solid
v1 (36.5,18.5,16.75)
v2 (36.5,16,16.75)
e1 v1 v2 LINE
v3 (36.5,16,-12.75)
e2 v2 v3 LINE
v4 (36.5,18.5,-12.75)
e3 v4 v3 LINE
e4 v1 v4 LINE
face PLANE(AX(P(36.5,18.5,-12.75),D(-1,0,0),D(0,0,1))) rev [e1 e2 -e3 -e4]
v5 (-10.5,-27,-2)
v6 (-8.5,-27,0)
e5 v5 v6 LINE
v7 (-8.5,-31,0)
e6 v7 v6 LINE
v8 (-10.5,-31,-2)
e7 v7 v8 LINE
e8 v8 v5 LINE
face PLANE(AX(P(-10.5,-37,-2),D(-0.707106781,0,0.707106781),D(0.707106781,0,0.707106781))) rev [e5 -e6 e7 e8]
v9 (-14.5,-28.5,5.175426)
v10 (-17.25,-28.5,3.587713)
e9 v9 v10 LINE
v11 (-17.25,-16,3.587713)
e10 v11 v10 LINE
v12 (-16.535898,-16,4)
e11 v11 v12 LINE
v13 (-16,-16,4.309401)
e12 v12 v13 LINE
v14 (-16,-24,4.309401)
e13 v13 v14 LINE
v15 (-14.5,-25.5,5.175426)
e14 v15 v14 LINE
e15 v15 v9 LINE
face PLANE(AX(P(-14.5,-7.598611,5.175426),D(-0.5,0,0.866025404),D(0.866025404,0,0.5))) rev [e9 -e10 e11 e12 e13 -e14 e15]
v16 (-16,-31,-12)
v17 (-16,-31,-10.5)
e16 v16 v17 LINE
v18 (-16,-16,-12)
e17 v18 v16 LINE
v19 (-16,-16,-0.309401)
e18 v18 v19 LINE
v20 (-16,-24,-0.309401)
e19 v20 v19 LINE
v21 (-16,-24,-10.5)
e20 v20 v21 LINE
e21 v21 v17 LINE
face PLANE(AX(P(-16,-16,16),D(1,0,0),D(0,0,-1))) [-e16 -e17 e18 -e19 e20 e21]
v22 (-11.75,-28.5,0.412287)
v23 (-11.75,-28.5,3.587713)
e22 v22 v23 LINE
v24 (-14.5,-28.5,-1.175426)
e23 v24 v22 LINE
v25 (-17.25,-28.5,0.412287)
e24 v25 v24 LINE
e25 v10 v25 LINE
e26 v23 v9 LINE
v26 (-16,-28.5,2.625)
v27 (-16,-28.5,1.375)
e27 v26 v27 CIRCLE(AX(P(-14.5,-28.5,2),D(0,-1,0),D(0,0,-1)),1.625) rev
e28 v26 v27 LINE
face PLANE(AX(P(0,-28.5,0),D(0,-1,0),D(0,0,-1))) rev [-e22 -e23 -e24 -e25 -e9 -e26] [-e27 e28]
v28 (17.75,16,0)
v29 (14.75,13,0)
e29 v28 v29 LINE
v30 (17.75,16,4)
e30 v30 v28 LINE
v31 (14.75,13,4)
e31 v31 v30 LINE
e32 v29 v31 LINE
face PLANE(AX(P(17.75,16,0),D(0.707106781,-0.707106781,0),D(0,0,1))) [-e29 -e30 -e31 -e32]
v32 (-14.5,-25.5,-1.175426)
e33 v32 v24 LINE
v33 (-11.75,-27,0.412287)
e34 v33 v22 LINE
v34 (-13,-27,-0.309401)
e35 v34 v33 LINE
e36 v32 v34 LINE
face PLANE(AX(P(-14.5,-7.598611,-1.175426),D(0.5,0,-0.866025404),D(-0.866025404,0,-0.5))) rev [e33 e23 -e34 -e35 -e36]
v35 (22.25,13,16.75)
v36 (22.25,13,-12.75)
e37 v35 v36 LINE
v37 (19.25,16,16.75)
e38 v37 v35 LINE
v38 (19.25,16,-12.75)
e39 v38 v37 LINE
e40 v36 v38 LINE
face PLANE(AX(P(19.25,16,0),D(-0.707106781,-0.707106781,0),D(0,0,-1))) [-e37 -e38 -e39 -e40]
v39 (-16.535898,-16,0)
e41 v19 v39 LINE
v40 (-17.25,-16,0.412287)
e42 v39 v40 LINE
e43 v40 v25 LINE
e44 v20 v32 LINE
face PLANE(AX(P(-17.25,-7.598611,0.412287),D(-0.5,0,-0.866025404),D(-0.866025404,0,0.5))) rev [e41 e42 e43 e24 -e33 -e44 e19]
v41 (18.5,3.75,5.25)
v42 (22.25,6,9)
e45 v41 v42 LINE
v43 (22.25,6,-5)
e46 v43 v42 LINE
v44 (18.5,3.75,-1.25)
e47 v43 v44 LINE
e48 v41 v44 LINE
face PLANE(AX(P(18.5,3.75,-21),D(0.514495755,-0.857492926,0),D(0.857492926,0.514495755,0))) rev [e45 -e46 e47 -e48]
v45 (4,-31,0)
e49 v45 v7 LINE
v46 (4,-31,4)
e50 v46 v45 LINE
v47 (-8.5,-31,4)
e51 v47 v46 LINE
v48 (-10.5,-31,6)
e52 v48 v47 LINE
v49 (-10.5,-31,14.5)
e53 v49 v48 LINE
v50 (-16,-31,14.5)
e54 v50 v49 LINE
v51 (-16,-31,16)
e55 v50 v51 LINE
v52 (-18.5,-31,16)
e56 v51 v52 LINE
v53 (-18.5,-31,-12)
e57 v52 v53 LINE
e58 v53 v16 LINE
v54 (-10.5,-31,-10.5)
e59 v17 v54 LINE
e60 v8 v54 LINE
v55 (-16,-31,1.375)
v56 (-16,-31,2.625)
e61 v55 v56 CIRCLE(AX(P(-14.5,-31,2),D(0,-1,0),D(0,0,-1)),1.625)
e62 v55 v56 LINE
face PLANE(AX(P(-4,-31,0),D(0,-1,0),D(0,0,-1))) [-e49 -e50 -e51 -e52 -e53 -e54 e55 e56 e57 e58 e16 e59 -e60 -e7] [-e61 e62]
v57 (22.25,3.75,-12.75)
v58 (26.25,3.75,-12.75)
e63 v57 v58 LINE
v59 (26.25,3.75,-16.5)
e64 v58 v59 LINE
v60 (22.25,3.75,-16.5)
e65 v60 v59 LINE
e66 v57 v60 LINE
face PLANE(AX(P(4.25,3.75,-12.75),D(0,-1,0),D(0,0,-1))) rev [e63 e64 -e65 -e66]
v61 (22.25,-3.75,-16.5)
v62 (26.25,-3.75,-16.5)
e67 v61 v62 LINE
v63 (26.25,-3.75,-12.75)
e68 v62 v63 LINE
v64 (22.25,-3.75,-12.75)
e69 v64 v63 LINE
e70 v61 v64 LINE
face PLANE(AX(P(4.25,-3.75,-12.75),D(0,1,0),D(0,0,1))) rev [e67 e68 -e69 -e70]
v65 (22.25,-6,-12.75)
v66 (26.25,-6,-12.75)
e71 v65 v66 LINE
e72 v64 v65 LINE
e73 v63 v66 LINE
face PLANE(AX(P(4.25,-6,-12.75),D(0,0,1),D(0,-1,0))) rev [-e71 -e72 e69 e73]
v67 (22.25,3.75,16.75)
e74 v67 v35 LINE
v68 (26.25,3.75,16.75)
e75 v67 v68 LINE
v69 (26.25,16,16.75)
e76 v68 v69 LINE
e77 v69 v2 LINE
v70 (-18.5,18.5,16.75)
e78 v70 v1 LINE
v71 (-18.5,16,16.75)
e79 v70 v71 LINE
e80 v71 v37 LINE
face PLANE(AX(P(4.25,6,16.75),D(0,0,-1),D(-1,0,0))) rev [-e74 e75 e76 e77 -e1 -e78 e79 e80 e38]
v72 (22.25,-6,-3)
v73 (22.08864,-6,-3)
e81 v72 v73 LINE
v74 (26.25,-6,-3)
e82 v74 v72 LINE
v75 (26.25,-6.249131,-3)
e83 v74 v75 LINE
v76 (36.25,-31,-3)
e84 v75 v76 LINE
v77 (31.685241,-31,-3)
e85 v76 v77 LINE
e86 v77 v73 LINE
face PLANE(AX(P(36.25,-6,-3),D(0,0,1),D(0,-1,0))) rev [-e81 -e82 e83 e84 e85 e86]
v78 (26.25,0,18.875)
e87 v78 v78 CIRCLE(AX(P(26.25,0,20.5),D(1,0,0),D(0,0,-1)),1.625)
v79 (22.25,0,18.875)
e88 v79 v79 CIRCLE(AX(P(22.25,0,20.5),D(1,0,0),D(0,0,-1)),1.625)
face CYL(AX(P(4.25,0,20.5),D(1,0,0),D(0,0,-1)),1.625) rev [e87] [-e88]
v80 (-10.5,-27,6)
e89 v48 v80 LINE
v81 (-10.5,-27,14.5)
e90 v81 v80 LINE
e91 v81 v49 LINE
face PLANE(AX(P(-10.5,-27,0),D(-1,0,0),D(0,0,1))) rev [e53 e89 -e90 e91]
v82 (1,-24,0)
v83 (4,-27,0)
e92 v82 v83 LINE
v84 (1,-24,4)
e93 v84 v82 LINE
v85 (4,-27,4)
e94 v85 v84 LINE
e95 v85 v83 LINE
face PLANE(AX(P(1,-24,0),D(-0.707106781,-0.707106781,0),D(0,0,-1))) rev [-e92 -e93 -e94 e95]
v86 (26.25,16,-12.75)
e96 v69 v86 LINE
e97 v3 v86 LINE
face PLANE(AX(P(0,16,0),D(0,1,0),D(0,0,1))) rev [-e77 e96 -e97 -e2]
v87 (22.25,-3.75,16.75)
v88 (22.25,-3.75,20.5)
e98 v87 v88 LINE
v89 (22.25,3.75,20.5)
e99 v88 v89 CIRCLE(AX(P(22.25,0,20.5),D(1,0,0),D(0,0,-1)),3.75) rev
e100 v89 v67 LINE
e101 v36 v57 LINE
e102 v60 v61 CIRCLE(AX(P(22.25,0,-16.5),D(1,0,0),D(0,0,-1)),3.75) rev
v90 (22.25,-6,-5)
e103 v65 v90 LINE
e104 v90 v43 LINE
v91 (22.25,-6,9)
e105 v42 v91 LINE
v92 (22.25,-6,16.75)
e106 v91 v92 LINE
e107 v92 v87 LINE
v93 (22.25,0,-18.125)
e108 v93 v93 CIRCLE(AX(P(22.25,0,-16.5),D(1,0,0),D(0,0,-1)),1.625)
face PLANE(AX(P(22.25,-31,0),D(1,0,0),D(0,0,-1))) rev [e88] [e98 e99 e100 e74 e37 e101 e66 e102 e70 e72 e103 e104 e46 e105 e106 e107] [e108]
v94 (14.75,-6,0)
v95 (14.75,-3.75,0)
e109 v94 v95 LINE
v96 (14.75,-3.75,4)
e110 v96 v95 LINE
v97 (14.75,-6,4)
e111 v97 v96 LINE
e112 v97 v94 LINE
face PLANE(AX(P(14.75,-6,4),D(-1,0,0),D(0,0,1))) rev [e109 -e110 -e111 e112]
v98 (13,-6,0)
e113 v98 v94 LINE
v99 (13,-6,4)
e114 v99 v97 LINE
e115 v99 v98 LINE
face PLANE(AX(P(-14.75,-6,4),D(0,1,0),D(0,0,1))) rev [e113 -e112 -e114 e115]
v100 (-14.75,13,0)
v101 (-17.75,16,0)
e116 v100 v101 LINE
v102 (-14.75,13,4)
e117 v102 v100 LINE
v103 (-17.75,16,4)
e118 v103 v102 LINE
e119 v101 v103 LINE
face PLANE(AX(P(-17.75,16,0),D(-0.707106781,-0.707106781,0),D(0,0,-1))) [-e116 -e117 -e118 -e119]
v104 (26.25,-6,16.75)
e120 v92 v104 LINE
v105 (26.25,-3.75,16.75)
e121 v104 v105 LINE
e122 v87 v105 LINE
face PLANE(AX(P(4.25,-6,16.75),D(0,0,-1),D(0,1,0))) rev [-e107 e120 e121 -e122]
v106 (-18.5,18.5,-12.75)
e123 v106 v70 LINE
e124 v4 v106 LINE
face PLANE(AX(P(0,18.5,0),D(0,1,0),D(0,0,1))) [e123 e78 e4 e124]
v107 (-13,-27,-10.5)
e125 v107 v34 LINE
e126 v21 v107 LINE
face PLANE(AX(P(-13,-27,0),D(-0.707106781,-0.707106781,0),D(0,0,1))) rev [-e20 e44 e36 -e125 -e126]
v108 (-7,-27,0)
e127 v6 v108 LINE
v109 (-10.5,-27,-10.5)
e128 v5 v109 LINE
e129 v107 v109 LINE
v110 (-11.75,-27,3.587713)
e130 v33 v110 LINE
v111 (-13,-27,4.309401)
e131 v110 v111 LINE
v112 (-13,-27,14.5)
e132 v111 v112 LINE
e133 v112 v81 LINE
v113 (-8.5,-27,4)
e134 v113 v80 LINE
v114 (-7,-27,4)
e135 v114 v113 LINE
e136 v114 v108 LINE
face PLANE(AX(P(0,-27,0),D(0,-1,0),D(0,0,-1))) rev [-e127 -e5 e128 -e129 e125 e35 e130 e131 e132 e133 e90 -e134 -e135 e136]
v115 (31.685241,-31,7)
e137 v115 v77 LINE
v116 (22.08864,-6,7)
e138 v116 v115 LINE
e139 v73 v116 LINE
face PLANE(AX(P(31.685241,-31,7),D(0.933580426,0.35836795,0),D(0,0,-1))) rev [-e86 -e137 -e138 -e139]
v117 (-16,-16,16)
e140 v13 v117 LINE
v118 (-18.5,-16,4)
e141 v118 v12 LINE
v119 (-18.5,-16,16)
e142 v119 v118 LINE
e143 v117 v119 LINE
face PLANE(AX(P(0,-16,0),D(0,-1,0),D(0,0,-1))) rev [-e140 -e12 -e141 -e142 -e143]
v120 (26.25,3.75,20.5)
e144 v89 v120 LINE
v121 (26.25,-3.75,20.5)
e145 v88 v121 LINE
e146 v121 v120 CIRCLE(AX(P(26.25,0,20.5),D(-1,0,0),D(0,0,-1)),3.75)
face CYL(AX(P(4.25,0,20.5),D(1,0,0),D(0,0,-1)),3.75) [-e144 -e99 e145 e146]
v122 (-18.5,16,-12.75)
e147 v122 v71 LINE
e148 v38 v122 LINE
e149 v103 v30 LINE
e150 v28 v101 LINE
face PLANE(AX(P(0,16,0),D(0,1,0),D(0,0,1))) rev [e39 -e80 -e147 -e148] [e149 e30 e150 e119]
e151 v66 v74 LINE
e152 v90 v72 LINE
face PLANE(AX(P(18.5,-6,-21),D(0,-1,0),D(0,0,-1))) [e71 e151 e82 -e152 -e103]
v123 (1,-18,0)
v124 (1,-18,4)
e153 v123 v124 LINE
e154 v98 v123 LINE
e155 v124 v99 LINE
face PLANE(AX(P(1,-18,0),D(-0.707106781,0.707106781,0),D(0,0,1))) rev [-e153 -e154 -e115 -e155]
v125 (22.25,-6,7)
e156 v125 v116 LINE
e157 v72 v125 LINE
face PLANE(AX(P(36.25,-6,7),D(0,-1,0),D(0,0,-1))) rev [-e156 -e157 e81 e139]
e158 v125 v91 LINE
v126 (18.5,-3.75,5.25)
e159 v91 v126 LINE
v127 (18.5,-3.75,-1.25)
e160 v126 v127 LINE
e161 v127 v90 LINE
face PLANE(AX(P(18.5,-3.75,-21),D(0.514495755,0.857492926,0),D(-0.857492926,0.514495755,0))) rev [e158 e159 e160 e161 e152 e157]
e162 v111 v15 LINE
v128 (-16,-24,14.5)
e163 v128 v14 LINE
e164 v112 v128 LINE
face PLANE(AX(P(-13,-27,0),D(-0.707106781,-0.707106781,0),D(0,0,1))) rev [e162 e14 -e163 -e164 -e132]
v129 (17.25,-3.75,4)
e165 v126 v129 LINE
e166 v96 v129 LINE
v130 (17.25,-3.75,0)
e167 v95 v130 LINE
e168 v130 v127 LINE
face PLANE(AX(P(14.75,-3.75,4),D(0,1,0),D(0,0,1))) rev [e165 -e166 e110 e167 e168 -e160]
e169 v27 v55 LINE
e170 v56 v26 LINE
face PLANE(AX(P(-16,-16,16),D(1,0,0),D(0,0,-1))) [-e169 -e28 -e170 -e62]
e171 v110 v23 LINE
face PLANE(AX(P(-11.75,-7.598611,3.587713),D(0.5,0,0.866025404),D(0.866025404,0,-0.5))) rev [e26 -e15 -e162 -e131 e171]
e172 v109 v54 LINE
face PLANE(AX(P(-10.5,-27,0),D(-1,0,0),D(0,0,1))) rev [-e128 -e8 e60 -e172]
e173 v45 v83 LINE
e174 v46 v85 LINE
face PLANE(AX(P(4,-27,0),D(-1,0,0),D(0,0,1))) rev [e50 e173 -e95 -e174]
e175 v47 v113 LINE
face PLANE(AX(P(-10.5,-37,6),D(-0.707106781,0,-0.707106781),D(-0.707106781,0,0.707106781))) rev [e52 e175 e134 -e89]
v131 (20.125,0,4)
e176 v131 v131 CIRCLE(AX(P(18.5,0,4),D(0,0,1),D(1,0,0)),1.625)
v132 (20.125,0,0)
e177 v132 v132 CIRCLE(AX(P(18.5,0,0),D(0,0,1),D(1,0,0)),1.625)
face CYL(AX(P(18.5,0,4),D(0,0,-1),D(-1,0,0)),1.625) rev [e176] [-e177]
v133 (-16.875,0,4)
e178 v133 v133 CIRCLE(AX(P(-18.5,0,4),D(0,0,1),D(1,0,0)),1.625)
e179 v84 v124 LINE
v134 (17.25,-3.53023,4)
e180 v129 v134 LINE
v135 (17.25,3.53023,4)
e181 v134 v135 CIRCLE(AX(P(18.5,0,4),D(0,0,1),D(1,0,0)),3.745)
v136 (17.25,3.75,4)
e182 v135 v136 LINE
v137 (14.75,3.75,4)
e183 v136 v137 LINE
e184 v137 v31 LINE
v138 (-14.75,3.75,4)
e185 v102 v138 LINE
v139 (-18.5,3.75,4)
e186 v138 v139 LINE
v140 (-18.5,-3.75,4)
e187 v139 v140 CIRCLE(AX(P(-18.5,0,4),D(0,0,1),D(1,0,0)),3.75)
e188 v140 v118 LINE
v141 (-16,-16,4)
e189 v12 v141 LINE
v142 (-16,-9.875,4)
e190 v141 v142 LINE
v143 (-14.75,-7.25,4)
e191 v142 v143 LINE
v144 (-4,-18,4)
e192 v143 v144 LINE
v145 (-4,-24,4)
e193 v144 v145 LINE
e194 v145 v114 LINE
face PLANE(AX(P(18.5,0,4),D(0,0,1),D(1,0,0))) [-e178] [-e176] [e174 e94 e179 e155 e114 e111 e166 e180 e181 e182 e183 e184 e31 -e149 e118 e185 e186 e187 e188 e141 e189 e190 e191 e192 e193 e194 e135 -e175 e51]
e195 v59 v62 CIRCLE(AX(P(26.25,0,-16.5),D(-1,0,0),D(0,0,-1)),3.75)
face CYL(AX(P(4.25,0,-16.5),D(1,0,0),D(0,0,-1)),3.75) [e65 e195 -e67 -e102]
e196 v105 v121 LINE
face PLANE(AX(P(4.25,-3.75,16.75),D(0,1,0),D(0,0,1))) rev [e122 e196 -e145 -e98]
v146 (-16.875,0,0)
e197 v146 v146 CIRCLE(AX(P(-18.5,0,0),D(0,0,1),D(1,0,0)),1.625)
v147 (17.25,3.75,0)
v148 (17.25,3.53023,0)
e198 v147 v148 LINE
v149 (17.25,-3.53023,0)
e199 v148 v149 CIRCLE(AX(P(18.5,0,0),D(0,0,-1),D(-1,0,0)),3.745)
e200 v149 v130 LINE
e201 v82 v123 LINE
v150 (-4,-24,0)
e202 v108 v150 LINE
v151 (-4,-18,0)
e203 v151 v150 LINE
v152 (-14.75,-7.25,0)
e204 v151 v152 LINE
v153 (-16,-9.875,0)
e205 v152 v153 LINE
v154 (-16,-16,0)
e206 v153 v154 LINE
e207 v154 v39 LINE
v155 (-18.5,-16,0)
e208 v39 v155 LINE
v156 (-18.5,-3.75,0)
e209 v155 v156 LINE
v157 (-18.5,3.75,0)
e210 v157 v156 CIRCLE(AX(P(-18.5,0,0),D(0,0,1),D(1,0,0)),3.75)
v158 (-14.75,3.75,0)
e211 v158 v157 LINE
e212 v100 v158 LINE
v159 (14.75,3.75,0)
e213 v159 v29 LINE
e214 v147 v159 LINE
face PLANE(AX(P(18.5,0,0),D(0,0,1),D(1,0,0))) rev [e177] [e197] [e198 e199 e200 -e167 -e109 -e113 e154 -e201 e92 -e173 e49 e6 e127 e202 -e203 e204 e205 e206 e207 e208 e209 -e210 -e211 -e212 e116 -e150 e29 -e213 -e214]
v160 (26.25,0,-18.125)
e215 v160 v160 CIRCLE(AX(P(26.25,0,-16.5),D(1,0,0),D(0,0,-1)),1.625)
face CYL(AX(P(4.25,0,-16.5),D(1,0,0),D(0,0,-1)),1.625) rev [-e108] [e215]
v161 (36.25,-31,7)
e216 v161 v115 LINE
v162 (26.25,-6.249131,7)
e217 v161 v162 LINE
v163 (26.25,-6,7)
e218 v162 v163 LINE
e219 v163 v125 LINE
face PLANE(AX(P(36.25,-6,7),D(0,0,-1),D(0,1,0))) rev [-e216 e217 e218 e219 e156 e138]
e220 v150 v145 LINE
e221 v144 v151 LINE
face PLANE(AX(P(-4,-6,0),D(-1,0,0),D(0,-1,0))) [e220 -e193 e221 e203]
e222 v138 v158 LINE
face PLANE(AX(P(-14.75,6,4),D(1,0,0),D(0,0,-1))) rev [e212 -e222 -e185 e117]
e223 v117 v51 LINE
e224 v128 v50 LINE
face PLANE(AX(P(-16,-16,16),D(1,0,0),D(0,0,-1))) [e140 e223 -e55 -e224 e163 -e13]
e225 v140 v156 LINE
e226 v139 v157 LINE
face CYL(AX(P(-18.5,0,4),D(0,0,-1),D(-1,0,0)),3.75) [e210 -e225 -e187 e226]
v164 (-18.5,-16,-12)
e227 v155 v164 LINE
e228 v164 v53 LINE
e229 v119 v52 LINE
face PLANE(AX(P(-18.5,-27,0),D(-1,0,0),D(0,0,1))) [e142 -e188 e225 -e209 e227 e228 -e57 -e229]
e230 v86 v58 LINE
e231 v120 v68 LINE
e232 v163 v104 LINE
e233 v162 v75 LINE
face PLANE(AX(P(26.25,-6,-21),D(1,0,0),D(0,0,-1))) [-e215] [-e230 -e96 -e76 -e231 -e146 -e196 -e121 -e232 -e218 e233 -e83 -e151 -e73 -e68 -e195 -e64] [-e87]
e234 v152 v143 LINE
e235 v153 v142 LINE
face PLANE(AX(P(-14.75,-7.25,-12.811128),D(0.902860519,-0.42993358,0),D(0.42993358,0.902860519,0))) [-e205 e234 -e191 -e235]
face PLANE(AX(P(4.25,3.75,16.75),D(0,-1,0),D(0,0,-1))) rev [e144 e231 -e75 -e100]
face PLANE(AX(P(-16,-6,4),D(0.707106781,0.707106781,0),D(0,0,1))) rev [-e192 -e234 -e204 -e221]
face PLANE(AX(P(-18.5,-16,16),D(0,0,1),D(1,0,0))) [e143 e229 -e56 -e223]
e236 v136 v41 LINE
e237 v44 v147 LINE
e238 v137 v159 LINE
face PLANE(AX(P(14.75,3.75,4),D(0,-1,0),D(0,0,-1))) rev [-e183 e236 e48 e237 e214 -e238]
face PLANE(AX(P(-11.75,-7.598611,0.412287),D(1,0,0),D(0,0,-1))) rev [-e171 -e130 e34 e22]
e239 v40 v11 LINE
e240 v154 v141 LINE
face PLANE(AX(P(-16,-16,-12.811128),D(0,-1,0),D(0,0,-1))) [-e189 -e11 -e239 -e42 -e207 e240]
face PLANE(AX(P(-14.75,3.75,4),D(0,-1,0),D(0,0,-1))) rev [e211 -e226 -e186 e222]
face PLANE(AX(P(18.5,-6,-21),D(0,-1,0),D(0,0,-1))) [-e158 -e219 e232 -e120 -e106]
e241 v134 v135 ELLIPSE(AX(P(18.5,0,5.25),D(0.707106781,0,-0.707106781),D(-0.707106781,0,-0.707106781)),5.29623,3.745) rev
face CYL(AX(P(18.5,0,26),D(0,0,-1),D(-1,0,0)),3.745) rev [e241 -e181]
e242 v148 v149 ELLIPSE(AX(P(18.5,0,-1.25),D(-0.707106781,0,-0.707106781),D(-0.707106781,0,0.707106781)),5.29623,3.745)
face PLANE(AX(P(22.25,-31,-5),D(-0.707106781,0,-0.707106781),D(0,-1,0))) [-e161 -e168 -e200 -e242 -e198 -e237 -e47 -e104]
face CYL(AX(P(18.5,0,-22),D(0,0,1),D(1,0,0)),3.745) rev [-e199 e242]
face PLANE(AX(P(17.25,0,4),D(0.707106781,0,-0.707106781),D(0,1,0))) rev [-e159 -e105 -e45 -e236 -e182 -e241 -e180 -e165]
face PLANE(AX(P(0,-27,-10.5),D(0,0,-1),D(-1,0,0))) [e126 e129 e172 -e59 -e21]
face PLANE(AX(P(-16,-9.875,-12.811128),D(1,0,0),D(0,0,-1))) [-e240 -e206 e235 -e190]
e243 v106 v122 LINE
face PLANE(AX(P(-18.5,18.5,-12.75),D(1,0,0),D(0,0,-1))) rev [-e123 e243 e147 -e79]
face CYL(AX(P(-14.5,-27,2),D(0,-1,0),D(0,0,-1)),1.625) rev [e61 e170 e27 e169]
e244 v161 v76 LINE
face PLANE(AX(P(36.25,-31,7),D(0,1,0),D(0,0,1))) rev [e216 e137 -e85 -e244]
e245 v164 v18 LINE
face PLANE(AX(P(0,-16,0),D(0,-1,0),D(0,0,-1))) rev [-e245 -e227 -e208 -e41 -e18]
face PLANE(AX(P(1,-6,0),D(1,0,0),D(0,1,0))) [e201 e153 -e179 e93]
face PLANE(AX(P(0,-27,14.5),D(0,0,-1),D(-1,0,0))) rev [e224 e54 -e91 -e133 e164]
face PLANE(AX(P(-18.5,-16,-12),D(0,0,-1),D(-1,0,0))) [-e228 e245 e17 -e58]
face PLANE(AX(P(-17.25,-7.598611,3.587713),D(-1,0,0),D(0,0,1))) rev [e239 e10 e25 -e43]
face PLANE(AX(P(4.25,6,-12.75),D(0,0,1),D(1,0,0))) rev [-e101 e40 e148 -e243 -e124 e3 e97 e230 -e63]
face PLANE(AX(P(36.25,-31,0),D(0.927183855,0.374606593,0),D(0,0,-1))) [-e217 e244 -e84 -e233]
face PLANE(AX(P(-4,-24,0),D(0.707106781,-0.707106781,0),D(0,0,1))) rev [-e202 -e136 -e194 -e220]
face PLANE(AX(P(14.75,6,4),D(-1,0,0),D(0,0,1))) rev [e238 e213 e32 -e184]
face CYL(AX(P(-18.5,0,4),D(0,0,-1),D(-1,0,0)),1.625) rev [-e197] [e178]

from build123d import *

# Parameters (mm, degrees)
CROQUIS1_R                   = 1.625
SALIENTE_EXTRUIR1_DEPTH      = 4
CROQUIS2_W                   = 5
CROQUIS2_H                   = 25
SALIENTE_EXTRUIR2_DEPTH      = 4
CROQUIS3_R                   = 1.625
SALIENTE_EXTRUIR3_DEPTH      = 4
CHAFL_N1_SIZE                = 3
CHAFL_N2_SIZE                = 1.5
SALIENTE_EXTRUIR4_DEPTH      = 21
SALIENTE_EXTRUIR4_DEPTH_BACK = 25
CROQUIS4_W                   = 7.75
CROQUIS4_H                   = 12
CORTAR_EXTRUIR1_DEPTH        = 52.798286651
CORTAR_EXTRUIR1_DEPTH_BACK   = 52.798286651
CROQUIS5_W                   = 3.75
CROQUIS5_H                   = 21
CORTAR_EXTRUIR2_DEPTH        = 48.697615244
CORTAR_EXTRUIR2_DEPTH_BACK   = 48.697615244
CROQUIS6_R                   = 1.625
CHAFL_N4_SIZE                = 5
CROQUIS7_R                   = 3.745
CORTAR_EXTRUIR5_DEPTH        = 22
CORTAR_EXTRUIR6_START        = 22
CROQUIS8_R                   = 3.745
CORTAR_EXTRUIR6_DEPTH        = 22
CORTAR_EXTRUIR7_DEPTH        = 22
CROQUIS10_R                  = 1.625
CORTAR_EXTRUIR8_DEPTH        = 22
CHAFL_N5_SIZE                = 12
CROQUIS11_W                  = 2.5
CROQUIS11_H                  = 28
SALIENTE_EXTRUIR5_DEPTH      = 15
CHAFL_N6_SIZE                = 3
CORTAR_EXTRUIR9_REACH        = 55.94
CORTAR_EXTRUIR9_START        = -2.5
CORTAR_EXTRUIR10_DEPTH       = 10
SALIENTE_EXTRUIR6_DEPTH      = 10
SALIENTE_EXTRUIR6_DEPTH_BACK = 8
CROQUIS14_W                  = 10
CROQUIS14_H                  = 25
CROQUIS15_W                  = 29.5
CROQUIS15_H                  = 4
CROQUIS15_W_2                = 4
CROQUIS15_H_2                = 29.5
SALIENTE_EXTRUIR7_DEPTH      = 10
CROQUIS16_W                  = 55
CROQUIS16_H                  = 29.5
SALIENTE_EXTRUIR8_DEPTH      = 2.5
CHAFL_N7_SIZE                = 3
SALIENTE_EXTRUIR9_DEPTH      = 4
CHAFL_N11_SIZE               = 3
CHAFL_N12_SIZE               = 10.100655646
CHAFL_N12_SIZE_2             = 25
CHAFL_N14_SIZE               = 35
CHAFL_N14_SIZE_2             = 13.435241226


# Some blends are built 0.0001 mm under size
with BuildPart() as part:
    # Croquis1 → Saliente-Extruir1 (new body)
    with BuildSketch(Plane.XY):
        with BuildLine():
            Line((-14.75, 6), (-14.75, 3.75))
            Line((-14.75, 3.75), (-18.5, 3.75))
            ThreePointArc((-18.5, 3.75), (-22.25, 0), (-18.5, -3.75))
            Line((-18.5, -3.75), (-14.75, -3.75))
            Line((-14.75, -3.75), (-14.75, -6))
            Line((-14.75, -6), (14.75, -6))
            Line((14.75, -6), (14.75, -3.75))
            Line((14.75, -3.75), (18.5, -3.75))
            ThreePointArc((18.5, -3.75), (22.25, 0), (18.5, 3.75))
            Line((18.5, 3.75), (14.75, 3.75))
            Line((14.75, 3.75), (14.75, 6))
            Line((14.75, 6), (-14.75, 6))
        make_face()
        with Locations((-18.5, 0)):
            Circle(CROQUIS1_R, mode=Mode.SUBTRACT)
        with Locations((18.5, 0)):
            Circle(CROQUIS1_R, mode=Mode.SUBTRACT)
    extrude(amount=SALIENTE_EXTRUIR1_DEPTH)

    # Croquis2 → Saliente-Extruir2 (add)
    with BuildSketch(Plane.XY.offset(4)):
        with Locations((-1.5, -18.5)):
            Rectangle(CROQUIS2_W, CROQUIS2_H)
    extrude(amount=-SALIENTE_EXTRUIR2_DEPTH)

    # Croquis3 → Saliente-Extruir3 (add)
    with BuildSketch(Plane.XZ.offset(31)):
        Polygon((-10.5, -1.5), (-10.5, -10.5), (-18.5, -10.5), (-18.5, 14.5), (-10.5, 14.5), (-10.5, 5.5), (4, 5.5), (4, -1.5), align=None)
        with Locations(Location((-14.5, 2, 0), (0, 0, 270))):
            Circle(CROQUIS3_R, mode=Mode.SUBTRACT)
    extrude(amount=-SALIENTE_EXTRUIR3_DEPTH)

    # Chaflán1
    chafl_n1_edges = [part.edges().sort_by_distance(p)[0] for p in [
        (-4, -27, 2),
    ]]
    chamfer(chafl_n1_edges, length=CHAFL_N1_SIZE)

    # Chaflán2
    chafl_n2_edges = [part.edges().sort_by_distance(p)[0] for p in [
        (-10.5, -29, -1.5),
        (-10.5, -29, 5.5),
    ]]
    chamfer(chafl_n2_edges, length=CHAFL_N2_SIZE)

    # Croquis4 → Saliente-Extruir4 (add, two sides: drawn at the far end of the back side and taken through both)
    with BuildSketch(Plane.XY.offset(4).offset(-SALIENTE_EXTRUIR4_DEPTH_BACK)):
        with Locations((22.375, 0)):
            Rectangle(CROQUIS4_W, CROQUIS4_H)
    extrude(amount=SALIENTE_EXTRUIR4_DEPTH + SALIENTE_EXTRUIR4_DEPTH_BACK)

    # Croquis5 → Cortar-Extruir1 (cut, two sides: drawn at the far end of the back side and taken through both)
    with BuildSketch(Plane(origin=(0, 6, 0), x_dir=(1, 0, 0), z_dir=(0, 1, 0)).offset(-CORTAR_EXTRUIR1_DEPTH_BACK)):
        with Locations((20.375, 10.5)):
            Rectangle(CROQUIS5_W, CROQUIS5_H)
        with Locations((20.375, -14.5)):
            Rectangle(CROQUIS5_W, CROQUIS5_H)
    extrude(amount=CORTAR_EXTRUIR1_DEPTH + CORTAR_EXTRUIR1_DEPTH_BACK, mode=Mode.SUBTRACT)

    # Croquis6 → Cortar-Extruir2 (cut, two sides: drawn at the far end of the back side and taken through both)
    with BuildSketch(Plane.XY.offset(4).offset(-CORTAR_EXTRUIR2_DEPTH_BACK)):
        with Locations((18.5, 0)):
            Circle(CROQUIS6_R)
        Polygon((18.5, 3.75), (22.25, 6), (18.5, 6), align=None)
        Polygon((18.5, -3.75), (22.25, -6), (18.5, -6), align=None)
    extrude(amount=CORTAR_EXTRUIR2_DEPTH + CORTAR_EXTRUIR2_DEPTH_BACK, mode=Mode.SUBTRACT)

    # Chaflán4
    # the kernel refuses this chamfer: 5 mm, written as the material it adds along each edge
    with BuildSketch(Plane(origin=(22.25, -6, 0), x_dir=(-0.9996219169112968, 0, 0.027495876610586372), z_dir=(0, 1, 0))) as chafl_n4_piece_1_section:
        Polygon((CHAFL_N4_SIZE * 0.999621916911, -CHAFL_N4_SIZE * 0.0274958766106), (-CHAFL_N4_SIZE * 0.0274958766106, -CHAFL_N4_SIZE * 0.999621916911), (0, 0), align=None)
    chafl_n4_piece_1 = extrude(amount=12, mode=Mode.PRIVATE)
    chafl_n4_piece_1 = split(chafl_n4_piece_1, bisect_by=Plane(origin=(20.922110661, -5.203266397, -2.017665357), z_dir=(0.5144957554275262, 0.8574929257125444, 0)), keep=Keep.TOP, mode=Mode.PRIVATE)
    chafl_n4_piece_1 = split(chafl_n4_piece_1, bisect_by=Plane(origin=(21.29244932, -3.75, -2.017665357), z_dir=(0, -1, 0)), keep=Keep.TOP, mode=Mode.PRIVATE)
    add(chafl_n4_piece_1)
    with BuildSketch(Plane(origin=(22.25, -6, 0), x_dir=(-0.9996219169112968, 0, 0.027495876610586372), z_dir=(0, 1, 0))) as chafl_n4_piece_2_section:
        Polygon((CHAFL_N4_SIZE * 0.999621916911, -CHAFL_N4_SIZE * 0.0274958766106), (-CHAFL_N4_SIZE * 0.0274958766106, -CHAFL_N4_SIZE * 0.999621916911), (0, 0), align=None)
    chafl_n4_piece_2 = extrude(amount=12, mode=Mode.PRIVATE)
    chafl_n4_piece_2 = split(chafl_n4_piece_2, bisect_by=Plane(origin=(17.859122077, -3.365473246, -0.159071565), z_dir=(-0.5144957554275262, -0.8574929257125444, 0)), keep=Keep.TOP, mode=Mode.PRIVATE)
    chafl_n4_piece_2 = split(chafl_n4_piece_2, bisect_by=Plane(origin=(17.761361038, -3.75, -0.159071565), z_dir=(0, 1, 0)), keep=Keep.TOP, mode=Mode.PRIVATE)
    add(chafl_n4_piece_2)
    with BuildSketch(Plane(origin=(22.25, -6, 0), x_dir=(-0.9996219169112968, 0, 0.027495876610586372), z_dir=(0, 1, 0))) as chafl_n4_piece_3_section:
        Polygon((CHAFL_N4_SIZE * 0.999621916911, -CHAFL_N4_SIZE * 0.0274958766106), (-CHAFL_N4_SIZE * 0.0274958766106, -CHAFL_N4_SIZE * 0.999621916911), (0, 0), align=None)
    chafl_n4_piece_3 = extrude(amount=12, mode=Mode.PRIVATE)
    chafl_n4_piece_3 = split(chafl_n4_piece_3, bisect_by=Plane(origin=(20.83228479, 3.75, -1.77005128), z_dir=(0, -1, 0)), keep=Keep.TOP, mode=Mode.PRIVATE)
    chafl_n4_piece_3 = split(chafl_n4_piece_3, bisect_by=Plane(origin=(18.560503744, 3.786302247, -1.77005128), z_dir=(0.5144957554275259, -0.8574929257125447, 0)), keep=Keep.TOP, mode=Mode.PRIVATE)
    chafl_n4_piece_3 = split(chafl_n4_piece_3, bisect_by=Plane(origin=(18.560503299, -3.786301979, -1.77005128), z_dir=(0.5144957554275262, 0.8574929257125444, 0)), keep=Keep.TOP, mode=Mode.PRIVATE)
    chafl_n4_piece_3 = split(chafl_n4_piece_3, bisect_by=Plane(origin=(20.83228479, -3.75, -1.77005128), z_dir=(0, 1, 0)), keep=Keep.TOP, mode=Mode.PRIVATE)
    chafl_n4_piece_3 = chafl_n4_piece_3 - Plane(origin=(18.5, 0, -1.77005128), x_dir=(1, 0, 0), z_dir=(0, 0, -1)) * Cylinder(1.625, 44, mode=Mode.PRIVATE)
    add(chafl_n4_piece_3)
    with BuildSketch(Plane(origin=(22.25, -6, 0), x_dir=(-0.9996219169112968, 0, 0.027495876610586372), z_dir=(0, 1, 0))) as chafl_n4_piece_4_section:
        Polygon((CHAFL_N4_SIZE * 0.999621916911, -CHAFL_N4_SIZE * 0.0274958766106), (-CHAFL_N4_SIZE * 0.0274958766106, -CHAFL_N4_SIZE * 0.999621916911), (0, 0), align=None)
    chafl_n4_piece_4 = extrude(amount=12, mode=Mode.PRIVATE)
    chafl_n4_piece_4 = split(chafl_n4_piece_4, bisect_by=Plane(origin=(21.29244932, 3.75, -2.017665357), z_dir=(0, 1, 0)), keep=Keep.TOP, mode=Mode.PRIVATE)
    chafl_n4_piece_4 = split(chafl_n4_piece_4, bisect_by=Plane(origin=(20.922110661, 5.203266397, -2.017665357), z_dir=(0.5144957554275259, -0.8574929257125447, 0)), keep=Keep.TOP, mode=Mode.PRIVATE)
    add(chafl_n4_piece_4)
    with BuildSketch(Plane(origin=(22.25, -6, 0), x_dir=(-0.9996219169112968, 0, 0.027495876610586372), z_dir=(0, 1, 0))) as chafl_n4_piece_5_section:
        Polygon((CHAFL_N4_SIZE * 0.999621916911, -CHAFL_N4_SIZE * 0.0274958766106), (-CHAFL_N4_SIZE * 0.0274958766106, -CHAFL_N4_SIZE * 0.999621916911), (0, 0), align=None)
    chafl_n4_piece_5 = extrude(amount=12, mode=Mode.PRIVATE)
    chafl_n4_piece_5 = split(chafl_n4_piece_5, bisect_by=Plane(origin=(17.761361038, 3.75, -0.159071565), z_dir=(0, -1, 0)), keep=Keep.TOP, mode=Mode.PRIVATE)
    chafl_n4_piece_5 = split(chafl_n4_piece_5, bisect_by=Plane(origin=(17.859122077, 3.365473246, -0.159071565), z_dir=(-0.5144957554275259, 0.8574929257125447, 0)), keep=Keep.TOP, mode=Mode.PRIVATE)
    add(chafl_n4_piece_5)
    with BuildSketch(Plane(origin=(22.25, 6, 4), x_dir=(-0.9996219169112968, 0, -0.027495876610586403), z_dir=(0, -1, 0))) as chafl_n4_piece_6_section:
        Polygon((CHAFL_N4_SIZE * 0.999621916911, -CHAFL_N4_SIZE * 0.0274958766106), (-CHAFL_N4_SIZE * 0.0274958766106, -CHAFL_N4_SIZE * 0.999621916911), (0, 0), align=None)
    chafl_n4_piece_6 = extrude(amount=12, mode=Mode.PRIVATE)
    chafl_n4_piece_6 = split(chafl_n4_piece_6, bisect_by=Plane(origin=(21.29244932, 3.75, 6.017665357), z_dir=(0, 1, 0)), keep=Keep.TOP, mode=Mode.PRIVATE)
    chafl_n4_piece_6 = split(chafl_n4_piece_6, bisect_by=Plane(origin=(20.922110661, 5.203266397, 6.017665357), z_dir=(0.5144957554275259, -0.8574929257125447, 0)), keep=Keep.TOP, mode=Mode.PRIVATE)
    add(chafl_n4_piece_6)
    with BuildSketch(Plane(origin=(22.25, 6, 4), x_dir=(-0.9996219169112968, 0, -0.027495876610586403), z_dir=(0, -1, 0))) as chafl_n4_piece_7_section:
        Polygon((CHAFL_N4_SIZE * 0.999621916911, -CHAFL_N4_SIZE * 0.0274958766106), (-CHAFL_N4_SIZE * 0.0274958766106, -CHAFL_N4_SIZE * 0.999621916911), (0, 0), align=None)
    chafl_n4_piece_7 = extrude(amount=12, mode=Mode.PRIVATE)
    chafl_n4_piece_7 = split(chafl_n4_piece_7, bisect_by=Plane(origin=(17.761361038, 3.75, 4.159071565), z_dir=(0, -1, 0)), keep=Keep.TOP, mode=Mode.PRIVATE)
    chafl_n4_piece_7 = split(chafl_n4_piece_7, bisect_by=Plane(origin=(17.859122077, 3.365473246, 4.159071565), z_dir=(-0.5144957554275259, 0.8574929257125447, 0)), keep=Keep.TOP, mode=Mode.PRIVATE)
    add(chafl_n4_piece_7)
    with BuildSketch(Plane(origin=(22.25, 6, 4), x_dir=(-0.9996219169112968, 0, -0.027495876610586403), z_dir=(0, -1, 0))) as chafl_n4_piece_8_section:
        Polygon((CHAFL_N4_SIZE * 0.999621916911, -CHAFL_N4_SIZE * 0.0274958766106), (-CHAFL_N4_SIZE * 0.0274958766106, -CHAFL_N4_SIZE * 0.999621916911), (0, 0), align=None)
    chafl_n4_piece_8 = extrude(amount=12, mode=Mode.PRIVATE)
    chafl_n4_piece_8 = split(chafl_n4_piece_8, bisect_by=Plane(origin=(20.832284794, 3.75, 5.770051284), z_dir=(0, -1, 0)), keep=Keep.TOP, mode=Mode.PRIVATE)
    chafl_n4_piece_8 = split(chafl_n4_piece_8, bisect_by=Plane(origin=(18.560503747, 3.786302248, 5.770051284), z_dir=(0.5144957554275259, -0.8574929257125447, 0)), keep=Keep.TOP, mode=Mode.PRIVATE)
    chafl_n4_piece_8 = split(chafl_n4_piece_8, bisect_by=Plane(origin=(18.560503303, -3.786301982, 5.770051284), z_dir=(0.5144957554275262, 0.8574929257125444, 0)), keep=Keep.TOP, mode=Mode.PRIVATE)
    chafl_n4_piece_8 = split(chafl_n4_piece_8, bisect_by=Plane(origin=(20.832284794, -3.75, 5.770051284), z_dir=(0, 1, 0)), keep=Keep.TOP, mode=Mode.PRIVATE)
    chafl_n4_piece_8 = chafl_n4_piece_8 - Plane(origin=(18.5, 0, 5.770051284), x_dir=(1, 0, 0), z_dir=(0, 0, -1)) * Cylinder(1.625, 44, mode=Mode.PRIVATE)
    add(chafl_n4_piece_8)
    with BuildSketch(Plane(origin=(22.25, 6, 4), x_dir=(-0.9996219169112968, 0, -0.027495876610586403), z_dir=(0, -1, 0))) as chafl_n4_piece_9_section:
        Polygon((CHAFL_N4_SIZE * 0.999621916911, -CHAFL_N4_SIZE * 0.0274958766106), (-CHAFL_N4_SIZE * 0.0274958766106, -CHAFL_N4_SIZE * 0.999621916911), (0, 0), align=None)
    chafl_n4_piece_9 = extrude(amount=12, mode=Mode.PRIVATE)
    chafl_n4_piece_9 = split(chafl_n4_piece_9, bisect_by=Plane(origin=(20.922110661, -5.203266397, 6.017665357), z_dir=(0.5144957554275262, 0.8574929257125444, 0)), keep=Keep.TOP, mode=Mode.PRIVATE)
    chafl_n4_piece_9 = split(chafl_n4_piece_9, bisect_by=Plane(origin=(21.29244932, -3.75, 6.017665357), z_dir=(0, -1, 0)), keep=Keep.TOP, mode=Mode.PRIVATE)
    add(chafl_n4_piece_9)
    with BuildSketch(Plane(origin=(22.25, 6, 4), x_dir=(-0.9996219169112968, 0, -0.027495876610586403), z_dir=(0, -1, 0))) as chafl_n4_piece_10_section:
        Polygon((CHAFL_N4_SIZE * 0.999621916911, -CHAFL_N4_SIZE * 0.0274958766106), (-CHAFL_N4_SIZE * 0.0274958766106, -CHAFL_N4_SIZE * 0.999621916911), (0, 0), align=None)
    chafl_n4_piece_10 = extrude(amount=12, mode=Mode.PRIVATE)
    chafl_n4_piece_10 = split(chafl_n4_piece_10, bisect_by=Plane(origin=(17.859122077, -3.365473246, 4.159071565), z_dir=(-0.5144957554275262, -0.8574929257125444, 0)), keep=Keep.TOP, mode=Mode.PRIVATE)
    chafl_n4_piece_10 = split(chafl_n4_piece_10, bisect_by=Plane(origin=(17.761361038, -3.75, 4.159071565), z_dir=(0, 1, 0)), keep=Keep.TOP, mode=Mode.PRIVATE)
    add(chafl_n4_piece_10)

    # Croquis7 → Cortar-Extruir5 (cut)
    with BuildSketch(Plane.XY.offset(4)):
        with Locations((18.5, 0)):
            Circle(CROQUIS7_R)
    extrude(amount=CORTAR_EXTRUIR5_DEPTH, mode=Mode.SUBTRACT)

    # Croquis8 → Cortar-Extruir6 (cut)
    with BuildSketch(Plane(origin=(0, 0, 0), x_dir=(-1, 0, 0), z_dir=(0, 0, -1)).offset(CORTAR_EXTRUIR6_START)):
        with Locations((-18.5, 0)):
            Circle(CROQUIS8_R)
    extrude(amount=-CORTAR_EXTRUIR6_DEPTH, mode=Mode.SUBTRACT)

    # Croquis9 → Cortar-Extruir7 (cut)
    with BuildSketch(Plane(origin=(26.25, 0, 0), x_dir=(0, 0, -1), z_dir=(1, 0, 0))):
        with BuildLine():
            Line((-16.75, 6), (-16.75, 3.75))
            Line((-16.75, 3.75), (-20.5, 3.75))
            ThreePointArc((-20.5, 3.75), (-24.25, 0), (-20.5, -3.75))
            Line((-20.5, -3.75), (-16.75, -3.75))
            Line((-16.75, -3.75), (-16.75, -6))
            Line((-16.75, -6), (-25, -6))
            Line((-25, -6), (-25, 6))
            Line((-25, 6), (-16.75, 6))
        make_face()
        with BuildLine():
            Line((12.75, -6), (12.75, -3.75))
            Line((12.75, -3.75), (16.5, -3.75))
            ThreePointArc((16.5, -3.75), (20.25, 0), (16.5, 3.75))
            Line((16.5, 3.75), (12.75, 3.75))
            Line((12.75, 3.75), (12.75, 6))
            Line((12.75, 6), (21, 6))
            Line((21, 6), (21, -6))
            Line((21, -6), (12.75, -6))
        make_face()
    extrude(amount=-CORTAR_EXTRUIR7_DEPTH, mode=Mode.SUBTRACT)

    # Croquis10 → Cortar-Extruir8 (cut)
    with BuildSketch(Plane(origin=(26.25, 0, 0), x_dir=(0, 0, -1), z_dir=(1, 0, 0))):
        with Locations((-20.5, 0)):
            Circle(CROQUIS10_R)
        with Locations((16.5, 0)):
            Circle(CROQUIS10_R)
    extrude(amount=-CORTAR_EXTRUIR8_DEPTH, mode=Mode.SUBTRACT)

    # Chaflán5
    # the kernel refuses this chamfer: 12 mm, written as the material it adds along each edge
    with BuildSketch(Plane(origin=(-4, -6, 4), x_dir=(0.02749587661058656, -0.9996219169112968, 0), z_dir=(0, 0, -1))) as chafl_n5_piece_1_section:
        Polygon((CHAFL_N5_SIZE * 0.999621916911, CHAFL_N5_SIZE * 0.0274958766106), (-CHAFL_N5_SIZE * 0.0274958766106, CHAFL_N5_SIZE * 0.999621916911), (0, 0), align=None)
    chafl_n5_piece_1 = extrude(amount=4, mode=Mode.PRIVATE)
    chafl_n5_piece_1 = split(chafl_n5_piece_1, bisect_by=Plane(origin=(-14.75, -10.034768689, 2), z_dir=(1, 0, 0)), keep=Keep.TOP, mode=Mode.PRIVATE)
    add(chafl_n5_piece_1)
    with BuildSketch(Plane(origin=(1, -6, 4), x_dir=(-0.027495876610586226, -0.9996219169112968, 0), z_dir=(0, 0, -1))) as chafl_n5_piece_2:
        Polygon((CHAFL_N5_SIZE * 0.999621916911, -CHAFL_N5_SIZE * 0.0274958766106), (-CHAFL_N5_SIZE * 0.0274958766106, -CHAFL_N5_SIZE * 0.999621916911), (0, 0), align=None)
    extrude(amount=4)

    # Croquis11 → Saliente-Extruir5 (add)
    with BuildSketch(Plane.XZ.offset(31)):
        with Locations((-17.25, 2)):
            Rectangle(CROQUIS11_W, CROQUIS11_H)
    extrude(amount=-SALIENTE_EXTRUIR5_DEPTH)

    # Chaflán6
    chafl_n6_edges = [part.edges().sort_by_distance(p)[0] for p in [
        (-16, -27, -4.5625),
        (-16, -27, 8.5625),
    ]]
    chamfer(chafl_n6_edges, length=CHAFL_N6_SIZE)

    # Cortar-Extruir9: up to this face of the body (flat: up to its plane)
    cortar_extruir9_end = Plane(part.part.faces().sort_by_distance((-17.25, -16, 2))[0])
    # Croquis12 → Cortar-Extruir9 (cut, up to the picked face)
    with BuildSketch(Plane.XZ.offset(31).offset(CORTAR_EXTRUIR9_START), mode=Mode.PRIVATE) as cortar_extruir9_sk1:
        Polygon((-11.75, 0.41228676), (-11.75, 3.58771324), (-14.5, 5.175426481), (-17.25, 3.58771324), (-17.25, 0.41228676), (-14.5, -1.175426481), align=None)
    cortar_extruir9_tool1 = split(extrude(cortar_extruir9_sk1.sketch, amount=-CORTAR_EXTRUIR9_REACH, mode=Mode.PRIVATE), bisect_by=cortar_extruir9_end, keep=Keep.BOTH, mode=Mode.PRIVATE)
    add(cortar_extruir9_tool1.solids().sort_by(Axis((-14.5, -28.5, 2), (0, 1, 0)))[0], mode=Mode.SUBTRACT)

    # Croquis13 → Cortar-Extruir10 (cut)
    with BuildSketch(Plane(origin=(0, -27, 0), x_dir=(1, 0, 0), z_dir=(0, 1, 0))):
        Polygon((-10.5, 3), (-10.5, 2), (-8.5, 0), (4, 0), (4, 5.164967874), align=None)
        Polygon((4, -9.164967874), (-10.5, -7), (-10.5, -6), (-8.5, -4), (4, -4), align=None)
    extrude(amount=-CORTAR_EXTRUIR10_DEPTH, mode=Mode.SUBTRACT)

    # Croquis14 → Saliente-Extruir6 (add, two sides: drawn at the far end of the back side and taken through both)
    with BuildSketch(Plane(origin=(26.25, 0, 0), x_dir=(0, 0, -1), z_dir=(1, 0, 0)).offset(-SALIENTE_EXTRUIR6_DEPTH_BACK)):
        with Locations((-2, -18.5)):
            Rectangle(CROQUIS14_W, CROQUIS14_H)
    extrude(amount=SALIENTE_EXTRUIR6_DEPTH + SALIENTE_EXTRUIR6_DEPTH_BACK)

    # Croquis15 → Saliente-Extruir7 (add)
    with BuildSketch(Plane(origin=(0, 6, 0), x_dir=(1, 0, 0), z_dir=(0, 1, 0))):
        with Locations((0, -2)):
            Rectangle(CROQUIS15_W, CROQUIS15_H)
        with Locations((24.25, -2)):
            Rectangle(CROQUIS15_W_2, CROQUIS15_H_2)
    extrude(amount=SALIENTE_EXTRUIR7_DEPTH)

    # Croquis16 → Saliente-Extruir8 (add)
    with BuildSketch(Plane(origin=(0, 16, 0), x_dir=(1, 0, 0), z_dir=(0, 1, 0))):
        with Locations((9, -2)):
            Rectangle(CROQUIS16_W, CROQUIS16_H)
    extrude(amount=SALIENTE_EXTRUIR8_DEPTH)

    # Chaflán7
    chafl_n7_edges = [part.edges().sort_by_distance(p)[0] for p in [
        (-14.75, 16, 2),
        (14.75, 16, 2),
        (22.25, 16, 2),
    ]]
    chamfer(chafl_n7_edges, length=CHAFL_N7_SIZE)

    # Croquis17 → Saliente-Extruir9 (add)
    with BuildSketch(Plane.XY.offset(4)):
        Polygon((-18.5, -16), (-18.5, -3.75), (-14.75, -3.75), (-14.75, -7.25), (-16, -9.875), (-16, -16), align=None)
    extrude(amount=-SALIENTE_EXTRUIR9_DEPTH)

    # Chaflán11
    chafl_n11_edges = [part.edges().sort_by_distance(p)[0] for p in [
        (1, -27, 2),
    ]]
    chamfer(chafl_n11_edges, length=CHAFL_N11_SIZE - 0.0001)  # a hair under: the kernel refuses the full size

    # Chaflán12
    # the kernel refuses this chamfer: 25, 10.100655646 mm, written as the material it takes off along each edge
    with BuildSketch(Plane(origin=(36.25, -6, 71.824724871), x_dir=(-0.9961057015681394, 0.08816706473193467, 0), z_dir=(0, 0, -1))) as chafl_n12_piece_1_section:
        Polygon((CHAFL_N12_SIZE * 0.996105701556, -CHAFL_N12_SIZE * 0.0881670647309), (-CHAFL_N12_SIZE_2 * 0.0881670647319, -CHAFL_N12_SIZE_2 * 0.996105701568), (0, 0), align=None)
    chafl_n12_piece_1 = extrude(amount=139.649449741, mode=Mode.PRIVATE)
    chafl_n12_piece_1 = split(chafl_n12_piece_1, bisect_by=Plane(origin=(26.25, -14.541402501, 2), z_dir=(1, 0, 0)), keep=Keep.TOP, mode=Mode.PRIVATE)
    add(chafl_n12_piece_1, mode=Mode.SUBTRACT)

    # Chaflán14
    # the kernel refuses this chamfer: 35, 13.435241226 mm, written as the material it takes off along each edge
    with BuildSketch(Plane(origin=(18.25, -31, -93.776197383), x_dir=(-0.013817364679015908, 0.9999045356599435, 0), z_dir=(0, 0, 1))) as chafl_n14_piece_1_section:
        Polygon((CHAFL_N14_SIZE * 0.99990453566, -CHAFL_N14_SIZE * 0.013817364679), (-CHAFL_N14_SIZE_2 * 0.0138173646793, -CHAFL_N14_SIZE_2 * 0.999904535678), (0, 0), align=None)
    chafl_n14_piece_1 = extrude(amount=191.552394765, mode=Mode.PRIVATE)
    chafl_n14_piece_1 = split(chafl_n14_piece_1, bisect_by=Plane(origin=(18.916666667, -6, -2.333333333), z_dir=(0, -1, 0)), keep=Keep.TOP, mode=Mode.PRIVATE)
    add(chafl_n14_piece_1, mode=Mode.SUBTRACT)


solid = part.part
